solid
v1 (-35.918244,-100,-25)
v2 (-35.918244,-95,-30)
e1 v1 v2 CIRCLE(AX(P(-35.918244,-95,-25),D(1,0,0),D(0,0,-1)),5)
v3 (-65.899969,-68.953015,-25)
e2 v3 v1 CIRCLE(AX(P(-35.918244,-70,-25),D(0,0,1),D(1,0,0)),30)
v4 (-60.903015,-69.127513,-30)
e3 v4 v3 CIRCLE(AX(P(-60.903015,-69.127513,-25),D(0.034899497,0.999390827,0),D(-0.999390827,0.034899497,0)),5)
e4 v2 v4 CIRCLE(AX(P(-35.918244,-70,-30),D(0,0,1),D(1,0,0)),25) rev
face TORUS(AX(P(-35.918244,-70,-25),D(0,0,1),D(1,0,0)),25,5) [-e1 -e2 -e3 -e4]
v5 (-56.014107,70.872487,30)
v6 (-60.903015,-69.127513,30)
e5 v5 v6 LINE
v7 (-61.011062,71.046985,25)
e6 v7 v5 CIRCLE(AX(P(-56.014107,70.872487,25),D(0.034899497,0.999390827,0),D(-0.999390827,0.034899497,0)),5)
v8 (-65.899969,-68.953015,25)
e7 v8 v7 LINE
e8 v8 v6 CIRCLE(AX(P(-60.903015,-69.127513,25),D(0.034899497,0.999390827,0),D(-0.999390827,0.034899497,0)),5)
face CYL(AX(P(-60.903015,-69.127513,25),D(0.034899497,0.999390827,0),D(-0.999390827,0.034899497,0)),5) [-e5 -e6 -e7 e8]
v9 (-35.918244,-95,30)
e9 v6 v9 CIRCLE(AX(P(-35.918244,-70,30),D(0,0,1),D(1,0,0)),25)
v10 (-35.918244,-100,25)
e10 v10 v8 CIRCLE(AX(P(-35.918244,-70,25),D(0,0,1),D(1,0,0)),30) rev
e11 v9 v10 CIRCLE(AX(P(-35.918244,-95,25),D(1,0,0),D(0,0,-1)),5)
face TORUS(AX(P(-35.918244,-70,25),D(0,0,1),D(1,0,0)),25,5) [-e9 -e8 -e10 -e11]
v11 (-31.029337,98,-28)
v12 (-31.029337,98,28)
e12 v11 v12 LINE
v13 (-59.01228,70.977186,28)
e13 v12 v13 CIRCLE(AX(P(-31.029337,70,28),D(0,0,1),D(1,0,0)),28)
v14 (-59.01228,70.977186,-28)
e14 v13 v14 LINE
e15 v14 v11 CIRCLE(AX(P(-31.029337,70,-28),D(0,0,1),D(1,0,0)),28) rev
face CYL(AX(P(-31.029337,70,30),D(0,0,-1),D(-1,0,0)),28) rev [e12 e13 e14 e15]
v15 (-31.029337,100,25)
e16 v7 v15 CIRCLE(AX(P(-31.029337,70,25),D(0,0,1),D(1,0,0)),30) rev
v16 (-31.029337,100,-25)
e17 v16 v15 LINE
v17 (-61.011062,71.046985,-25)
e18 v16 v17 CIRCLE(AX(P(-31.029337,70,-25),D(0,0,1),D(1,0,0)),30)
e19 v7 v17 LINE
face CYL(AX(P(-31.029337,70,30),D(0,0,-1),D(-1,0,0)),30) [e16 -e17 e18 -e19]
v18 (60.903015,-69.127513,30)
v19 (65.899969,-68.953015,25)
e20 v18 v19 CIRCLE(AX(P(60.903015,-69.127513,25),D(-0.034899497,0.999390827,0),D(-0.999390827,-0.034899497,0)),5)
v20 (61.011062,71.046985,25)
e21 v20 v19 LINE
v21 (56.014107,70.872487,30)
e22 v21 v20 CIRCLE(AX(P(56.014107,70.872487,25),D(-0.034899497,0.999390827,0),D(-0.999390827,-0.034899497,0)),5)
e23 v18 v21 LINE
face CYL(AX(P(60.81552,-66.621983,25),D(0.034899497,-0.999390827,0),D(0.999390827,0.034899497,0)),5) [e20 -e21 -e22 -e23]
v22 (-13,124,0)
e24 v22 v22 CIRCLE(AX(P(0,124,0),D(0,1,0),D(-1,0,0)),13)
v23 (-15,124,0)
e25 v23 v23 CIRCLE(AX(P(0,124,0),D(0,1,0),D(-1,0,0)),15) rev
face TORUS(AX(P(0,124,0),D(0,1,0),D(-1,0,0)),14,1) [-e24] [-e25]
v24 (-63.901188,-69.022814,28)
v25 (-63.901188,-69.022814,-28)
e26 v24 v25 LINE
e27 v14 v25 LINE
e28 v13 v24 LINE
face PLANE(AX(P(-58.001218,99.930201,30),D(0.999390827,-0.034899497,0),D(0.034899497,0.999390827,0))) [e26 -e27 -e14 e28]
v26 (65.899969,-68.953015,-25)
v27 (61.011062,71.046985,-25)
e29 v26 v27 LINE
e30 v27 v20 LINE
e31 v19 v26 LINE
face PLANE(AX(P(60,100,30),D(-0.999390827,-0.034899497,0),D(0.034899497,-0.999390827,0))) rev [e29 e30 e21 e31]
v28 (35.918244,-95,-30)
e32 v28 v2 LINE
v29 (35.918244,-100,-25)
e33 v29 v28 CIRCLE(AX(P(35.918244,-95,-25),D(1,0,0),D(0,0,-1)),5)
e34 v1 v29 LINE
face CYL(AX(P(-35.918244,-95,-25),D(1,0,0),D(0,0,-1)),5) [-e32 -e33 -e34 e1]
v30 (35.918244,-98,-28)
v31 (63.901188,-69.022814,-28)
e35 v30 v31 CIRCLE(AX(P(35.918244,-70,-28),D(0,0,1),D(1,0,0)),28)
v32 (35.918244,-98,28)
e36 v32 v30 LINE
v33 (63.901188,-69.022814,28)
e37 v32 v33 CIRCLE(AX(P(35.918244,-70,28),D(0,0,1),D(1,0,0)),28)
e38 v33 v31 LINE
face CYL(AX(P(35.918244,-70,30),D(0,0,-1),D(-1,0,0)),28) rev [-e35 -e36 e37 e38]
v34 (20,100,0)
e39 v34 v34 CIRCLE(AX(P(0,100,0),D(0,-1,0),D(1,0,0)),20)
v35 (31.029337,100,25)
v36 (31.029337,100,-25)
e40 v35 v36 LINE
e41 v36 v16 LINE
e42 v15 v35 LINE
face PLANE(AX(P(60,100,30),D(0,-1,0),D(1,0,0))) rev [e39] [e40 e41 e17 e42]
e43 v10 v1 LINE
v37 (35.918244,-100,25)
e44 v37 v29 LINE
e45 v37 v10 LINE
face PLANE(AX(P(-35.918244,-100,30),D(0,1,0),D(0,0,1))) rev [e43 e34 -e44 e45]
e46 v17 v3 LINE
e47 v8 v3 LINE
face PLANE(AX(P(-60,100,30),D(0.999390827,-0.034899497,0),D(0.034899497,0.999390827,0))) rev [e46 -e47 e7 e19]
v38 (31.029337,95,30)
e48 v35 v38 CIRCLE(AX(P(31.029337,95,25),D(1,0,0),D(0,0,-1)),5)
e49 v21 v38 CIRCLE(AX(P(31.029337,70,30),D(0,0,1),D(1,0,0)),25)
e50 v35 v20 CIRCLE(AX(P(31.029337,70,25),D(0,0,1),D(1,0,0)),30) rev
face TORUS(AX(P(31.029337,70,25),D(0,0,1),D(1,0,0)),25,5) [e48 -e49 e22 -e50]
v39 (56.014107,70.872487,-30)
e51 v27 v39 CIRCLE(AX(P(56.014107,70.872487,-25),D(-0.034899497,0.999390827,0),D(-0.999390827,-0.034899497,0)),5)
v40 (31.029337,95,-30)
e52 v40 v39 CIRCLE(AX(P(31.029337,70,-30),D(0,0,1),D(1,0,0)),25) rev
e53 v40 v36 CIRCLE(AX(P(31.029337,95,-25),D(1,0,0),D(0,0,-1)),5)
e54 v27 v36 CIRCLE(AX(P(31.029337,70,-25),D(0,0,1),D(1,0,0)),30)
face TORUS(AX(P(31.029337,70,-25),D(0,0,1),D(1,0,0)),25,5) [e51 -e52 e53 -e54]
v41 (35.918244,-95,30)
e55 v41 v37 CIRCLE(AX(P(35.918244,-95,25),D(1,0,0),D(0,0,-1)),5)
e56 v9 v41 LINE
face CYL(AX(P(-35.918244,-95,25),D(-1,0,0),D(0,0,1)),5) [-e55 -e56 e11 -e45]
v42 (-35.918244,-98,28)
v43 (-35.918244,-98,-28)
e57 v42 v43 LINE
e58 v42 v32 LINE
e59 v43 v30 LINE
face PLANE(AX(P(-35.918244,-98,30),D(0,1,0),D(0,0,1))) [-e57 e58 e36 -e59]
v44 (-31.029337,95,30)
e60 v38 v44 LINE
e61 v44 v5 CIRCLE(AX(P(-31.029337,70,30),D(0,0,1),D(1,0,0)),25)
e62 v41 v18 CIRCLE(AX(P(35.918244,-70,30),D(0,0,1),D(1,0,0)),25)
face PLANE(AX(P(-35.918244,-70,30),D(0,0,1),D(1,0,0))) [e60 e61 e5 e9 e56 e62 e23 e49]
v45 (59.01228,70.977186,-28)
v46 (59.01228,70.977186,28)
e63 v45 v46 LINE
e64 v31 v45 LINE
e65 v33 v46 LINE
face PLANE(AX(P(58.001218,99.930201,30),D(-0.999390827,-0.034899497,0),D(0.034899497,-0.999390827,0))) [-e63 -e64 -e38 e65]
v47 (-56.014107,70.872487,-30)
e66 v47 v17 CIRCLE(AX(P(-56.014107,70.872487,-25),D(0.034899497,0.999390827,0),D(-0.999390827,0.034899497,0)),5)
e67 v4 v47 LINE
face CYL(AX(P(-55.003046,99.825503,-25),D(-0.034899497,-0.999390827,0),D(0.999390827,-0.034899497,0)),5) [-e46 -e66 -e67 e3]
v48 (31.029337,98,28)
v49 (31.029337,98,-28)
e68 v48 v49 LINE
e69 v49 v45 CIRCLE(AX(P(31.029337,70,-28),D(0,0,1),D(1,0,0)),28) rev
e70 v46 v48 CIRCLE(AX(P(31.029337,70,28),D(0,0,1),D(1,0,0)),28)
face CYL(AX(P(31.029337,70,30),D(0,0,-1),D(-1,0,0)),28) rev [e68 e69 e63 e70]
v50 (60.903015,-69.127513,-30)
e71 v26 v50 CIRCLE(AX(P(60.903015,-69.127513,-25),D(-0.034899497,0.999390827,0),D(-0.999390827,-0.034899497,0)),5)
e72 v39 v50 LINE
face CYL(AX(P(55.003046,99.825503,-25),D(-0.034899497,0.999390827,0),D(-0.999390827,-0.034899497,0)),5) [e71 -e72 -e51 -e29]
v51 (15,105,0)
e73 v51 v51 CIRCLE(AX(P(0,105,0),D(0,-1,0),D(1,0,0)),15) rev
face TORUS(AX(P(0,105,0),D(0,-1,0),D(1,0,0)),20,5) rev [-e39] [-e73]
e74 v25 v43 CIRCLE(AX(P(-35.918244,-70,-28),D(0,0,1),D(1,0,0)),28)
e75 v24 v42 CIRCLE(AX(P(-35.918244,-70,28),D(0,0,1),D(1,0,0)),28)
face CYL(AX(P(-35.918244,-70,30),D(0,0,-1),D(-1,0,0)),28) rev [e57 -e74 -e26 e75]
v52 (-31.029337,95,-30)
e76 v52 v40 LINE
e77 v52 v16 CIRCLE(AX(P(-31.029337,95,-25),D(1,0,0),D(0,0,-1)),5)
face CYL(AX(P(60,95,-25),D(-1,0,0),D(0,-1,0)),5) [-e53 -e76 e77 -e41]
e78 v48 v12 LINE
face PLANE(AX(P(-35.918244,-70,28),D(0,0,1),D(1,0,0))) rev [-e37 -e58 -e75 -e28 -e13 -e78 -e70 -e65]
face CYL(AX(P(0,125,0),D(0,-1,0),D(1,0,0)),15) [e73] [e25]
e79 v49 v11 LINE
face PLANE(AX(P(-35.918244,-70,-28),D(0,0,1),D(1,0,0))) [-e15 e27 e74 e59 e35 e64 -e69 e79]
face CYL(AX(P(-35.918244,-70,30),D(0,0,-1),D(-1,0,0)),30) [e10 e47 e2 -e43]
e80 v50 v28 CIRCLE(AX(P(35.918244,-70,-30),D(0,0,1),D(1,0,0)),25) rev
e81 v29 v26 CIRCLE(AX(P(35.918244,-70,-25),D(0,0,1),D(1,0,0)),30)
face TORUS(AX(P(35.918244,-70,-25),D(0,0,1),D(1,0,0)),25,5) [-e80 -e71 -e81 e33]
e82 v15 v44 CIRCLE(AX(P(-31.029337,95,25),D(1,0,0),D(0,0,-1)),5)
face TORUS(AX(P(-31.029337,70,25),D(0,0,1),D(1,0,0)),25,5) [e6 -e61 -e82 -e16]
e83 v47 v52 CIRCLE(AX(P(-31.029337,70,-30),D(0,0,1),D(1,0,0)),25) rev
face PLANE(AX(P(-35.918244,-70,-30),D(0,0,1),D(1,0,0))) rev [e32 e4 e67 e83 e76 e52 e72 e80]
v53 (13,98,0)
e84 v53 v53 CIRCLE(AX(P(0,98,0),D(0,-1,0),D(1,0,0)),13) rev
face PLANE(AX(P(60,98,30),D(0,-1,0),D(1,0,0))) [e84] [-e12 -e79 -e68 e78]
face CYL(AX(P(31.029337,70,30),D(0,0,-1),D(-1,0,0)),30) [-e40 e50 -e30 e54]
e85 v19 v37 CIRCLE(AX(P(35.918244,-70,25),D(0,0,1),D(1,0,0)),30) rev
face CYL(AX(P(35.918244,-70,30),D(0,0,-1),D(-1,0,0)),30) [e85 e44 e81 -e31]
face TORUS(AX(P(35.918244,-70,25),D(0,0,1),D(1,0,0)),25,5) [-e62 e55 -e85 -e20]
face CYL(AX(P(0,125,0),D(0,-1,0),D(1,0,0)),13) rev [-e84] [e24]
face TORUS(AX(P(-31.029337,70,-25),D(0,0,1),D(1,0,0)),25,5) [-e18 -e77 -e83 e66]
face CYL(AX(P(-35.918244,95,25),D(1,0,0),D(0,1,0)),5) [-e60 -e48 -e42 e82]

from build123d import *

# Parameters (mm, degrees)
EXTRUDE_1_DEPTH = 30
FILLET_1_R      = 30
SKETCH_2_R      = 15
EXTRUDE_2_DEPTH = 25
SHELL_1_T       = -2
FILLET_3_R      = 5
FILLET_4_R      = 1


with BuildPart() as part:
    # 草图1 → 凸台-拉伸1 (new, symmetric)
    with BuildSketch(Plane.XY):
        with BuildLine():
            Line((60, 100), (-60, 100))
            Line((-60, 100), (-65.899969295, -68.953015099))
            ThreePointArc((-65.899969295, -68.953015099), (-57.498438495, -90.839751114), (-35.918244485, -100))
            Line((-35.918244485, -100), (35.918244485, -100))
            ThreePointArc((35.918244485, -100), (57.498438495, -90.839751114), (65.899969295, -68.953015099))
            Line((65.899969295, -68.953015099), (60, 100))
        make_face()
    extrude(amount=EXTRUDE_1_DEPTH, both=True)

    # 圆角1
    fillet_1_edges = [part.edges().sort_by_distance(p)[0] for p in [
        (-60, 100, 0),
        (60, 100, 0),
    ]]
    fillet(fillet_1_edges, radius=FILLET_1_R)

    # 草图2 → 凸台-拉伸2 (add)
    with BuildSketch(Plane(origin=(0, 100, 0), x_dir=(1, 0, 0), z_dir=(0, 1, 0))):
        Circle(SKETCH_2_R)
    extrude(amount=EXTRUDE_2_DEPTH)

    # 抽壳1
    shell_1_openings = [part.faces().sort_by_distance(p)[0] for p in [
        (0, 125, 0),
    ]]
    offset(amount=SHELL_1_T, openings=shell_1_openings, kind=Kind.INTERSECTION)

    # 圆角3
    fillet_3_edges = [part.edges().sort_by_distance(p)[0] for p in [
        (0, -100, 30),
        (57.498438495, -90.839751114, 30),
        (0, 100, -30),
        (0, 100, 30),
        (63.455515431, 1.046984901, 30),
        (-63.455515431, 1.046984901, -30),
        (-51.86908787, 91.58019401, -30),
        (51.86908787, 91.58019401, -30),
        (-63.455515431, 1.046984901, 30),
        (-51.86908787, 91.58019401, 30),
        (51.86908787, 91.58019401, 30),
        (-15, 100, 0),
        (63.455515431, 1.046984901, -30),
        (57.498438495, -90.839751114, -30),
        (0, -100, -30),
        (-57.498438495, -90.839751114, -30),
        (-57.498438495, -90.839751114, 30),
    ]]
    fillet(fillet_3_edges, radius=FILLET_3_R)

    # 圆角4
    fillet_4_edges = [part.edges().sort_by_distance(p)[0] for p in [
        (-15, 125, 0),
        (-13, 125, 0),
    ]]
    fillet(fillet_4_edges, radius=FILLET_4_R - 0.0001)  # a hair under: the kernel refuses the full size


solid = part.part
